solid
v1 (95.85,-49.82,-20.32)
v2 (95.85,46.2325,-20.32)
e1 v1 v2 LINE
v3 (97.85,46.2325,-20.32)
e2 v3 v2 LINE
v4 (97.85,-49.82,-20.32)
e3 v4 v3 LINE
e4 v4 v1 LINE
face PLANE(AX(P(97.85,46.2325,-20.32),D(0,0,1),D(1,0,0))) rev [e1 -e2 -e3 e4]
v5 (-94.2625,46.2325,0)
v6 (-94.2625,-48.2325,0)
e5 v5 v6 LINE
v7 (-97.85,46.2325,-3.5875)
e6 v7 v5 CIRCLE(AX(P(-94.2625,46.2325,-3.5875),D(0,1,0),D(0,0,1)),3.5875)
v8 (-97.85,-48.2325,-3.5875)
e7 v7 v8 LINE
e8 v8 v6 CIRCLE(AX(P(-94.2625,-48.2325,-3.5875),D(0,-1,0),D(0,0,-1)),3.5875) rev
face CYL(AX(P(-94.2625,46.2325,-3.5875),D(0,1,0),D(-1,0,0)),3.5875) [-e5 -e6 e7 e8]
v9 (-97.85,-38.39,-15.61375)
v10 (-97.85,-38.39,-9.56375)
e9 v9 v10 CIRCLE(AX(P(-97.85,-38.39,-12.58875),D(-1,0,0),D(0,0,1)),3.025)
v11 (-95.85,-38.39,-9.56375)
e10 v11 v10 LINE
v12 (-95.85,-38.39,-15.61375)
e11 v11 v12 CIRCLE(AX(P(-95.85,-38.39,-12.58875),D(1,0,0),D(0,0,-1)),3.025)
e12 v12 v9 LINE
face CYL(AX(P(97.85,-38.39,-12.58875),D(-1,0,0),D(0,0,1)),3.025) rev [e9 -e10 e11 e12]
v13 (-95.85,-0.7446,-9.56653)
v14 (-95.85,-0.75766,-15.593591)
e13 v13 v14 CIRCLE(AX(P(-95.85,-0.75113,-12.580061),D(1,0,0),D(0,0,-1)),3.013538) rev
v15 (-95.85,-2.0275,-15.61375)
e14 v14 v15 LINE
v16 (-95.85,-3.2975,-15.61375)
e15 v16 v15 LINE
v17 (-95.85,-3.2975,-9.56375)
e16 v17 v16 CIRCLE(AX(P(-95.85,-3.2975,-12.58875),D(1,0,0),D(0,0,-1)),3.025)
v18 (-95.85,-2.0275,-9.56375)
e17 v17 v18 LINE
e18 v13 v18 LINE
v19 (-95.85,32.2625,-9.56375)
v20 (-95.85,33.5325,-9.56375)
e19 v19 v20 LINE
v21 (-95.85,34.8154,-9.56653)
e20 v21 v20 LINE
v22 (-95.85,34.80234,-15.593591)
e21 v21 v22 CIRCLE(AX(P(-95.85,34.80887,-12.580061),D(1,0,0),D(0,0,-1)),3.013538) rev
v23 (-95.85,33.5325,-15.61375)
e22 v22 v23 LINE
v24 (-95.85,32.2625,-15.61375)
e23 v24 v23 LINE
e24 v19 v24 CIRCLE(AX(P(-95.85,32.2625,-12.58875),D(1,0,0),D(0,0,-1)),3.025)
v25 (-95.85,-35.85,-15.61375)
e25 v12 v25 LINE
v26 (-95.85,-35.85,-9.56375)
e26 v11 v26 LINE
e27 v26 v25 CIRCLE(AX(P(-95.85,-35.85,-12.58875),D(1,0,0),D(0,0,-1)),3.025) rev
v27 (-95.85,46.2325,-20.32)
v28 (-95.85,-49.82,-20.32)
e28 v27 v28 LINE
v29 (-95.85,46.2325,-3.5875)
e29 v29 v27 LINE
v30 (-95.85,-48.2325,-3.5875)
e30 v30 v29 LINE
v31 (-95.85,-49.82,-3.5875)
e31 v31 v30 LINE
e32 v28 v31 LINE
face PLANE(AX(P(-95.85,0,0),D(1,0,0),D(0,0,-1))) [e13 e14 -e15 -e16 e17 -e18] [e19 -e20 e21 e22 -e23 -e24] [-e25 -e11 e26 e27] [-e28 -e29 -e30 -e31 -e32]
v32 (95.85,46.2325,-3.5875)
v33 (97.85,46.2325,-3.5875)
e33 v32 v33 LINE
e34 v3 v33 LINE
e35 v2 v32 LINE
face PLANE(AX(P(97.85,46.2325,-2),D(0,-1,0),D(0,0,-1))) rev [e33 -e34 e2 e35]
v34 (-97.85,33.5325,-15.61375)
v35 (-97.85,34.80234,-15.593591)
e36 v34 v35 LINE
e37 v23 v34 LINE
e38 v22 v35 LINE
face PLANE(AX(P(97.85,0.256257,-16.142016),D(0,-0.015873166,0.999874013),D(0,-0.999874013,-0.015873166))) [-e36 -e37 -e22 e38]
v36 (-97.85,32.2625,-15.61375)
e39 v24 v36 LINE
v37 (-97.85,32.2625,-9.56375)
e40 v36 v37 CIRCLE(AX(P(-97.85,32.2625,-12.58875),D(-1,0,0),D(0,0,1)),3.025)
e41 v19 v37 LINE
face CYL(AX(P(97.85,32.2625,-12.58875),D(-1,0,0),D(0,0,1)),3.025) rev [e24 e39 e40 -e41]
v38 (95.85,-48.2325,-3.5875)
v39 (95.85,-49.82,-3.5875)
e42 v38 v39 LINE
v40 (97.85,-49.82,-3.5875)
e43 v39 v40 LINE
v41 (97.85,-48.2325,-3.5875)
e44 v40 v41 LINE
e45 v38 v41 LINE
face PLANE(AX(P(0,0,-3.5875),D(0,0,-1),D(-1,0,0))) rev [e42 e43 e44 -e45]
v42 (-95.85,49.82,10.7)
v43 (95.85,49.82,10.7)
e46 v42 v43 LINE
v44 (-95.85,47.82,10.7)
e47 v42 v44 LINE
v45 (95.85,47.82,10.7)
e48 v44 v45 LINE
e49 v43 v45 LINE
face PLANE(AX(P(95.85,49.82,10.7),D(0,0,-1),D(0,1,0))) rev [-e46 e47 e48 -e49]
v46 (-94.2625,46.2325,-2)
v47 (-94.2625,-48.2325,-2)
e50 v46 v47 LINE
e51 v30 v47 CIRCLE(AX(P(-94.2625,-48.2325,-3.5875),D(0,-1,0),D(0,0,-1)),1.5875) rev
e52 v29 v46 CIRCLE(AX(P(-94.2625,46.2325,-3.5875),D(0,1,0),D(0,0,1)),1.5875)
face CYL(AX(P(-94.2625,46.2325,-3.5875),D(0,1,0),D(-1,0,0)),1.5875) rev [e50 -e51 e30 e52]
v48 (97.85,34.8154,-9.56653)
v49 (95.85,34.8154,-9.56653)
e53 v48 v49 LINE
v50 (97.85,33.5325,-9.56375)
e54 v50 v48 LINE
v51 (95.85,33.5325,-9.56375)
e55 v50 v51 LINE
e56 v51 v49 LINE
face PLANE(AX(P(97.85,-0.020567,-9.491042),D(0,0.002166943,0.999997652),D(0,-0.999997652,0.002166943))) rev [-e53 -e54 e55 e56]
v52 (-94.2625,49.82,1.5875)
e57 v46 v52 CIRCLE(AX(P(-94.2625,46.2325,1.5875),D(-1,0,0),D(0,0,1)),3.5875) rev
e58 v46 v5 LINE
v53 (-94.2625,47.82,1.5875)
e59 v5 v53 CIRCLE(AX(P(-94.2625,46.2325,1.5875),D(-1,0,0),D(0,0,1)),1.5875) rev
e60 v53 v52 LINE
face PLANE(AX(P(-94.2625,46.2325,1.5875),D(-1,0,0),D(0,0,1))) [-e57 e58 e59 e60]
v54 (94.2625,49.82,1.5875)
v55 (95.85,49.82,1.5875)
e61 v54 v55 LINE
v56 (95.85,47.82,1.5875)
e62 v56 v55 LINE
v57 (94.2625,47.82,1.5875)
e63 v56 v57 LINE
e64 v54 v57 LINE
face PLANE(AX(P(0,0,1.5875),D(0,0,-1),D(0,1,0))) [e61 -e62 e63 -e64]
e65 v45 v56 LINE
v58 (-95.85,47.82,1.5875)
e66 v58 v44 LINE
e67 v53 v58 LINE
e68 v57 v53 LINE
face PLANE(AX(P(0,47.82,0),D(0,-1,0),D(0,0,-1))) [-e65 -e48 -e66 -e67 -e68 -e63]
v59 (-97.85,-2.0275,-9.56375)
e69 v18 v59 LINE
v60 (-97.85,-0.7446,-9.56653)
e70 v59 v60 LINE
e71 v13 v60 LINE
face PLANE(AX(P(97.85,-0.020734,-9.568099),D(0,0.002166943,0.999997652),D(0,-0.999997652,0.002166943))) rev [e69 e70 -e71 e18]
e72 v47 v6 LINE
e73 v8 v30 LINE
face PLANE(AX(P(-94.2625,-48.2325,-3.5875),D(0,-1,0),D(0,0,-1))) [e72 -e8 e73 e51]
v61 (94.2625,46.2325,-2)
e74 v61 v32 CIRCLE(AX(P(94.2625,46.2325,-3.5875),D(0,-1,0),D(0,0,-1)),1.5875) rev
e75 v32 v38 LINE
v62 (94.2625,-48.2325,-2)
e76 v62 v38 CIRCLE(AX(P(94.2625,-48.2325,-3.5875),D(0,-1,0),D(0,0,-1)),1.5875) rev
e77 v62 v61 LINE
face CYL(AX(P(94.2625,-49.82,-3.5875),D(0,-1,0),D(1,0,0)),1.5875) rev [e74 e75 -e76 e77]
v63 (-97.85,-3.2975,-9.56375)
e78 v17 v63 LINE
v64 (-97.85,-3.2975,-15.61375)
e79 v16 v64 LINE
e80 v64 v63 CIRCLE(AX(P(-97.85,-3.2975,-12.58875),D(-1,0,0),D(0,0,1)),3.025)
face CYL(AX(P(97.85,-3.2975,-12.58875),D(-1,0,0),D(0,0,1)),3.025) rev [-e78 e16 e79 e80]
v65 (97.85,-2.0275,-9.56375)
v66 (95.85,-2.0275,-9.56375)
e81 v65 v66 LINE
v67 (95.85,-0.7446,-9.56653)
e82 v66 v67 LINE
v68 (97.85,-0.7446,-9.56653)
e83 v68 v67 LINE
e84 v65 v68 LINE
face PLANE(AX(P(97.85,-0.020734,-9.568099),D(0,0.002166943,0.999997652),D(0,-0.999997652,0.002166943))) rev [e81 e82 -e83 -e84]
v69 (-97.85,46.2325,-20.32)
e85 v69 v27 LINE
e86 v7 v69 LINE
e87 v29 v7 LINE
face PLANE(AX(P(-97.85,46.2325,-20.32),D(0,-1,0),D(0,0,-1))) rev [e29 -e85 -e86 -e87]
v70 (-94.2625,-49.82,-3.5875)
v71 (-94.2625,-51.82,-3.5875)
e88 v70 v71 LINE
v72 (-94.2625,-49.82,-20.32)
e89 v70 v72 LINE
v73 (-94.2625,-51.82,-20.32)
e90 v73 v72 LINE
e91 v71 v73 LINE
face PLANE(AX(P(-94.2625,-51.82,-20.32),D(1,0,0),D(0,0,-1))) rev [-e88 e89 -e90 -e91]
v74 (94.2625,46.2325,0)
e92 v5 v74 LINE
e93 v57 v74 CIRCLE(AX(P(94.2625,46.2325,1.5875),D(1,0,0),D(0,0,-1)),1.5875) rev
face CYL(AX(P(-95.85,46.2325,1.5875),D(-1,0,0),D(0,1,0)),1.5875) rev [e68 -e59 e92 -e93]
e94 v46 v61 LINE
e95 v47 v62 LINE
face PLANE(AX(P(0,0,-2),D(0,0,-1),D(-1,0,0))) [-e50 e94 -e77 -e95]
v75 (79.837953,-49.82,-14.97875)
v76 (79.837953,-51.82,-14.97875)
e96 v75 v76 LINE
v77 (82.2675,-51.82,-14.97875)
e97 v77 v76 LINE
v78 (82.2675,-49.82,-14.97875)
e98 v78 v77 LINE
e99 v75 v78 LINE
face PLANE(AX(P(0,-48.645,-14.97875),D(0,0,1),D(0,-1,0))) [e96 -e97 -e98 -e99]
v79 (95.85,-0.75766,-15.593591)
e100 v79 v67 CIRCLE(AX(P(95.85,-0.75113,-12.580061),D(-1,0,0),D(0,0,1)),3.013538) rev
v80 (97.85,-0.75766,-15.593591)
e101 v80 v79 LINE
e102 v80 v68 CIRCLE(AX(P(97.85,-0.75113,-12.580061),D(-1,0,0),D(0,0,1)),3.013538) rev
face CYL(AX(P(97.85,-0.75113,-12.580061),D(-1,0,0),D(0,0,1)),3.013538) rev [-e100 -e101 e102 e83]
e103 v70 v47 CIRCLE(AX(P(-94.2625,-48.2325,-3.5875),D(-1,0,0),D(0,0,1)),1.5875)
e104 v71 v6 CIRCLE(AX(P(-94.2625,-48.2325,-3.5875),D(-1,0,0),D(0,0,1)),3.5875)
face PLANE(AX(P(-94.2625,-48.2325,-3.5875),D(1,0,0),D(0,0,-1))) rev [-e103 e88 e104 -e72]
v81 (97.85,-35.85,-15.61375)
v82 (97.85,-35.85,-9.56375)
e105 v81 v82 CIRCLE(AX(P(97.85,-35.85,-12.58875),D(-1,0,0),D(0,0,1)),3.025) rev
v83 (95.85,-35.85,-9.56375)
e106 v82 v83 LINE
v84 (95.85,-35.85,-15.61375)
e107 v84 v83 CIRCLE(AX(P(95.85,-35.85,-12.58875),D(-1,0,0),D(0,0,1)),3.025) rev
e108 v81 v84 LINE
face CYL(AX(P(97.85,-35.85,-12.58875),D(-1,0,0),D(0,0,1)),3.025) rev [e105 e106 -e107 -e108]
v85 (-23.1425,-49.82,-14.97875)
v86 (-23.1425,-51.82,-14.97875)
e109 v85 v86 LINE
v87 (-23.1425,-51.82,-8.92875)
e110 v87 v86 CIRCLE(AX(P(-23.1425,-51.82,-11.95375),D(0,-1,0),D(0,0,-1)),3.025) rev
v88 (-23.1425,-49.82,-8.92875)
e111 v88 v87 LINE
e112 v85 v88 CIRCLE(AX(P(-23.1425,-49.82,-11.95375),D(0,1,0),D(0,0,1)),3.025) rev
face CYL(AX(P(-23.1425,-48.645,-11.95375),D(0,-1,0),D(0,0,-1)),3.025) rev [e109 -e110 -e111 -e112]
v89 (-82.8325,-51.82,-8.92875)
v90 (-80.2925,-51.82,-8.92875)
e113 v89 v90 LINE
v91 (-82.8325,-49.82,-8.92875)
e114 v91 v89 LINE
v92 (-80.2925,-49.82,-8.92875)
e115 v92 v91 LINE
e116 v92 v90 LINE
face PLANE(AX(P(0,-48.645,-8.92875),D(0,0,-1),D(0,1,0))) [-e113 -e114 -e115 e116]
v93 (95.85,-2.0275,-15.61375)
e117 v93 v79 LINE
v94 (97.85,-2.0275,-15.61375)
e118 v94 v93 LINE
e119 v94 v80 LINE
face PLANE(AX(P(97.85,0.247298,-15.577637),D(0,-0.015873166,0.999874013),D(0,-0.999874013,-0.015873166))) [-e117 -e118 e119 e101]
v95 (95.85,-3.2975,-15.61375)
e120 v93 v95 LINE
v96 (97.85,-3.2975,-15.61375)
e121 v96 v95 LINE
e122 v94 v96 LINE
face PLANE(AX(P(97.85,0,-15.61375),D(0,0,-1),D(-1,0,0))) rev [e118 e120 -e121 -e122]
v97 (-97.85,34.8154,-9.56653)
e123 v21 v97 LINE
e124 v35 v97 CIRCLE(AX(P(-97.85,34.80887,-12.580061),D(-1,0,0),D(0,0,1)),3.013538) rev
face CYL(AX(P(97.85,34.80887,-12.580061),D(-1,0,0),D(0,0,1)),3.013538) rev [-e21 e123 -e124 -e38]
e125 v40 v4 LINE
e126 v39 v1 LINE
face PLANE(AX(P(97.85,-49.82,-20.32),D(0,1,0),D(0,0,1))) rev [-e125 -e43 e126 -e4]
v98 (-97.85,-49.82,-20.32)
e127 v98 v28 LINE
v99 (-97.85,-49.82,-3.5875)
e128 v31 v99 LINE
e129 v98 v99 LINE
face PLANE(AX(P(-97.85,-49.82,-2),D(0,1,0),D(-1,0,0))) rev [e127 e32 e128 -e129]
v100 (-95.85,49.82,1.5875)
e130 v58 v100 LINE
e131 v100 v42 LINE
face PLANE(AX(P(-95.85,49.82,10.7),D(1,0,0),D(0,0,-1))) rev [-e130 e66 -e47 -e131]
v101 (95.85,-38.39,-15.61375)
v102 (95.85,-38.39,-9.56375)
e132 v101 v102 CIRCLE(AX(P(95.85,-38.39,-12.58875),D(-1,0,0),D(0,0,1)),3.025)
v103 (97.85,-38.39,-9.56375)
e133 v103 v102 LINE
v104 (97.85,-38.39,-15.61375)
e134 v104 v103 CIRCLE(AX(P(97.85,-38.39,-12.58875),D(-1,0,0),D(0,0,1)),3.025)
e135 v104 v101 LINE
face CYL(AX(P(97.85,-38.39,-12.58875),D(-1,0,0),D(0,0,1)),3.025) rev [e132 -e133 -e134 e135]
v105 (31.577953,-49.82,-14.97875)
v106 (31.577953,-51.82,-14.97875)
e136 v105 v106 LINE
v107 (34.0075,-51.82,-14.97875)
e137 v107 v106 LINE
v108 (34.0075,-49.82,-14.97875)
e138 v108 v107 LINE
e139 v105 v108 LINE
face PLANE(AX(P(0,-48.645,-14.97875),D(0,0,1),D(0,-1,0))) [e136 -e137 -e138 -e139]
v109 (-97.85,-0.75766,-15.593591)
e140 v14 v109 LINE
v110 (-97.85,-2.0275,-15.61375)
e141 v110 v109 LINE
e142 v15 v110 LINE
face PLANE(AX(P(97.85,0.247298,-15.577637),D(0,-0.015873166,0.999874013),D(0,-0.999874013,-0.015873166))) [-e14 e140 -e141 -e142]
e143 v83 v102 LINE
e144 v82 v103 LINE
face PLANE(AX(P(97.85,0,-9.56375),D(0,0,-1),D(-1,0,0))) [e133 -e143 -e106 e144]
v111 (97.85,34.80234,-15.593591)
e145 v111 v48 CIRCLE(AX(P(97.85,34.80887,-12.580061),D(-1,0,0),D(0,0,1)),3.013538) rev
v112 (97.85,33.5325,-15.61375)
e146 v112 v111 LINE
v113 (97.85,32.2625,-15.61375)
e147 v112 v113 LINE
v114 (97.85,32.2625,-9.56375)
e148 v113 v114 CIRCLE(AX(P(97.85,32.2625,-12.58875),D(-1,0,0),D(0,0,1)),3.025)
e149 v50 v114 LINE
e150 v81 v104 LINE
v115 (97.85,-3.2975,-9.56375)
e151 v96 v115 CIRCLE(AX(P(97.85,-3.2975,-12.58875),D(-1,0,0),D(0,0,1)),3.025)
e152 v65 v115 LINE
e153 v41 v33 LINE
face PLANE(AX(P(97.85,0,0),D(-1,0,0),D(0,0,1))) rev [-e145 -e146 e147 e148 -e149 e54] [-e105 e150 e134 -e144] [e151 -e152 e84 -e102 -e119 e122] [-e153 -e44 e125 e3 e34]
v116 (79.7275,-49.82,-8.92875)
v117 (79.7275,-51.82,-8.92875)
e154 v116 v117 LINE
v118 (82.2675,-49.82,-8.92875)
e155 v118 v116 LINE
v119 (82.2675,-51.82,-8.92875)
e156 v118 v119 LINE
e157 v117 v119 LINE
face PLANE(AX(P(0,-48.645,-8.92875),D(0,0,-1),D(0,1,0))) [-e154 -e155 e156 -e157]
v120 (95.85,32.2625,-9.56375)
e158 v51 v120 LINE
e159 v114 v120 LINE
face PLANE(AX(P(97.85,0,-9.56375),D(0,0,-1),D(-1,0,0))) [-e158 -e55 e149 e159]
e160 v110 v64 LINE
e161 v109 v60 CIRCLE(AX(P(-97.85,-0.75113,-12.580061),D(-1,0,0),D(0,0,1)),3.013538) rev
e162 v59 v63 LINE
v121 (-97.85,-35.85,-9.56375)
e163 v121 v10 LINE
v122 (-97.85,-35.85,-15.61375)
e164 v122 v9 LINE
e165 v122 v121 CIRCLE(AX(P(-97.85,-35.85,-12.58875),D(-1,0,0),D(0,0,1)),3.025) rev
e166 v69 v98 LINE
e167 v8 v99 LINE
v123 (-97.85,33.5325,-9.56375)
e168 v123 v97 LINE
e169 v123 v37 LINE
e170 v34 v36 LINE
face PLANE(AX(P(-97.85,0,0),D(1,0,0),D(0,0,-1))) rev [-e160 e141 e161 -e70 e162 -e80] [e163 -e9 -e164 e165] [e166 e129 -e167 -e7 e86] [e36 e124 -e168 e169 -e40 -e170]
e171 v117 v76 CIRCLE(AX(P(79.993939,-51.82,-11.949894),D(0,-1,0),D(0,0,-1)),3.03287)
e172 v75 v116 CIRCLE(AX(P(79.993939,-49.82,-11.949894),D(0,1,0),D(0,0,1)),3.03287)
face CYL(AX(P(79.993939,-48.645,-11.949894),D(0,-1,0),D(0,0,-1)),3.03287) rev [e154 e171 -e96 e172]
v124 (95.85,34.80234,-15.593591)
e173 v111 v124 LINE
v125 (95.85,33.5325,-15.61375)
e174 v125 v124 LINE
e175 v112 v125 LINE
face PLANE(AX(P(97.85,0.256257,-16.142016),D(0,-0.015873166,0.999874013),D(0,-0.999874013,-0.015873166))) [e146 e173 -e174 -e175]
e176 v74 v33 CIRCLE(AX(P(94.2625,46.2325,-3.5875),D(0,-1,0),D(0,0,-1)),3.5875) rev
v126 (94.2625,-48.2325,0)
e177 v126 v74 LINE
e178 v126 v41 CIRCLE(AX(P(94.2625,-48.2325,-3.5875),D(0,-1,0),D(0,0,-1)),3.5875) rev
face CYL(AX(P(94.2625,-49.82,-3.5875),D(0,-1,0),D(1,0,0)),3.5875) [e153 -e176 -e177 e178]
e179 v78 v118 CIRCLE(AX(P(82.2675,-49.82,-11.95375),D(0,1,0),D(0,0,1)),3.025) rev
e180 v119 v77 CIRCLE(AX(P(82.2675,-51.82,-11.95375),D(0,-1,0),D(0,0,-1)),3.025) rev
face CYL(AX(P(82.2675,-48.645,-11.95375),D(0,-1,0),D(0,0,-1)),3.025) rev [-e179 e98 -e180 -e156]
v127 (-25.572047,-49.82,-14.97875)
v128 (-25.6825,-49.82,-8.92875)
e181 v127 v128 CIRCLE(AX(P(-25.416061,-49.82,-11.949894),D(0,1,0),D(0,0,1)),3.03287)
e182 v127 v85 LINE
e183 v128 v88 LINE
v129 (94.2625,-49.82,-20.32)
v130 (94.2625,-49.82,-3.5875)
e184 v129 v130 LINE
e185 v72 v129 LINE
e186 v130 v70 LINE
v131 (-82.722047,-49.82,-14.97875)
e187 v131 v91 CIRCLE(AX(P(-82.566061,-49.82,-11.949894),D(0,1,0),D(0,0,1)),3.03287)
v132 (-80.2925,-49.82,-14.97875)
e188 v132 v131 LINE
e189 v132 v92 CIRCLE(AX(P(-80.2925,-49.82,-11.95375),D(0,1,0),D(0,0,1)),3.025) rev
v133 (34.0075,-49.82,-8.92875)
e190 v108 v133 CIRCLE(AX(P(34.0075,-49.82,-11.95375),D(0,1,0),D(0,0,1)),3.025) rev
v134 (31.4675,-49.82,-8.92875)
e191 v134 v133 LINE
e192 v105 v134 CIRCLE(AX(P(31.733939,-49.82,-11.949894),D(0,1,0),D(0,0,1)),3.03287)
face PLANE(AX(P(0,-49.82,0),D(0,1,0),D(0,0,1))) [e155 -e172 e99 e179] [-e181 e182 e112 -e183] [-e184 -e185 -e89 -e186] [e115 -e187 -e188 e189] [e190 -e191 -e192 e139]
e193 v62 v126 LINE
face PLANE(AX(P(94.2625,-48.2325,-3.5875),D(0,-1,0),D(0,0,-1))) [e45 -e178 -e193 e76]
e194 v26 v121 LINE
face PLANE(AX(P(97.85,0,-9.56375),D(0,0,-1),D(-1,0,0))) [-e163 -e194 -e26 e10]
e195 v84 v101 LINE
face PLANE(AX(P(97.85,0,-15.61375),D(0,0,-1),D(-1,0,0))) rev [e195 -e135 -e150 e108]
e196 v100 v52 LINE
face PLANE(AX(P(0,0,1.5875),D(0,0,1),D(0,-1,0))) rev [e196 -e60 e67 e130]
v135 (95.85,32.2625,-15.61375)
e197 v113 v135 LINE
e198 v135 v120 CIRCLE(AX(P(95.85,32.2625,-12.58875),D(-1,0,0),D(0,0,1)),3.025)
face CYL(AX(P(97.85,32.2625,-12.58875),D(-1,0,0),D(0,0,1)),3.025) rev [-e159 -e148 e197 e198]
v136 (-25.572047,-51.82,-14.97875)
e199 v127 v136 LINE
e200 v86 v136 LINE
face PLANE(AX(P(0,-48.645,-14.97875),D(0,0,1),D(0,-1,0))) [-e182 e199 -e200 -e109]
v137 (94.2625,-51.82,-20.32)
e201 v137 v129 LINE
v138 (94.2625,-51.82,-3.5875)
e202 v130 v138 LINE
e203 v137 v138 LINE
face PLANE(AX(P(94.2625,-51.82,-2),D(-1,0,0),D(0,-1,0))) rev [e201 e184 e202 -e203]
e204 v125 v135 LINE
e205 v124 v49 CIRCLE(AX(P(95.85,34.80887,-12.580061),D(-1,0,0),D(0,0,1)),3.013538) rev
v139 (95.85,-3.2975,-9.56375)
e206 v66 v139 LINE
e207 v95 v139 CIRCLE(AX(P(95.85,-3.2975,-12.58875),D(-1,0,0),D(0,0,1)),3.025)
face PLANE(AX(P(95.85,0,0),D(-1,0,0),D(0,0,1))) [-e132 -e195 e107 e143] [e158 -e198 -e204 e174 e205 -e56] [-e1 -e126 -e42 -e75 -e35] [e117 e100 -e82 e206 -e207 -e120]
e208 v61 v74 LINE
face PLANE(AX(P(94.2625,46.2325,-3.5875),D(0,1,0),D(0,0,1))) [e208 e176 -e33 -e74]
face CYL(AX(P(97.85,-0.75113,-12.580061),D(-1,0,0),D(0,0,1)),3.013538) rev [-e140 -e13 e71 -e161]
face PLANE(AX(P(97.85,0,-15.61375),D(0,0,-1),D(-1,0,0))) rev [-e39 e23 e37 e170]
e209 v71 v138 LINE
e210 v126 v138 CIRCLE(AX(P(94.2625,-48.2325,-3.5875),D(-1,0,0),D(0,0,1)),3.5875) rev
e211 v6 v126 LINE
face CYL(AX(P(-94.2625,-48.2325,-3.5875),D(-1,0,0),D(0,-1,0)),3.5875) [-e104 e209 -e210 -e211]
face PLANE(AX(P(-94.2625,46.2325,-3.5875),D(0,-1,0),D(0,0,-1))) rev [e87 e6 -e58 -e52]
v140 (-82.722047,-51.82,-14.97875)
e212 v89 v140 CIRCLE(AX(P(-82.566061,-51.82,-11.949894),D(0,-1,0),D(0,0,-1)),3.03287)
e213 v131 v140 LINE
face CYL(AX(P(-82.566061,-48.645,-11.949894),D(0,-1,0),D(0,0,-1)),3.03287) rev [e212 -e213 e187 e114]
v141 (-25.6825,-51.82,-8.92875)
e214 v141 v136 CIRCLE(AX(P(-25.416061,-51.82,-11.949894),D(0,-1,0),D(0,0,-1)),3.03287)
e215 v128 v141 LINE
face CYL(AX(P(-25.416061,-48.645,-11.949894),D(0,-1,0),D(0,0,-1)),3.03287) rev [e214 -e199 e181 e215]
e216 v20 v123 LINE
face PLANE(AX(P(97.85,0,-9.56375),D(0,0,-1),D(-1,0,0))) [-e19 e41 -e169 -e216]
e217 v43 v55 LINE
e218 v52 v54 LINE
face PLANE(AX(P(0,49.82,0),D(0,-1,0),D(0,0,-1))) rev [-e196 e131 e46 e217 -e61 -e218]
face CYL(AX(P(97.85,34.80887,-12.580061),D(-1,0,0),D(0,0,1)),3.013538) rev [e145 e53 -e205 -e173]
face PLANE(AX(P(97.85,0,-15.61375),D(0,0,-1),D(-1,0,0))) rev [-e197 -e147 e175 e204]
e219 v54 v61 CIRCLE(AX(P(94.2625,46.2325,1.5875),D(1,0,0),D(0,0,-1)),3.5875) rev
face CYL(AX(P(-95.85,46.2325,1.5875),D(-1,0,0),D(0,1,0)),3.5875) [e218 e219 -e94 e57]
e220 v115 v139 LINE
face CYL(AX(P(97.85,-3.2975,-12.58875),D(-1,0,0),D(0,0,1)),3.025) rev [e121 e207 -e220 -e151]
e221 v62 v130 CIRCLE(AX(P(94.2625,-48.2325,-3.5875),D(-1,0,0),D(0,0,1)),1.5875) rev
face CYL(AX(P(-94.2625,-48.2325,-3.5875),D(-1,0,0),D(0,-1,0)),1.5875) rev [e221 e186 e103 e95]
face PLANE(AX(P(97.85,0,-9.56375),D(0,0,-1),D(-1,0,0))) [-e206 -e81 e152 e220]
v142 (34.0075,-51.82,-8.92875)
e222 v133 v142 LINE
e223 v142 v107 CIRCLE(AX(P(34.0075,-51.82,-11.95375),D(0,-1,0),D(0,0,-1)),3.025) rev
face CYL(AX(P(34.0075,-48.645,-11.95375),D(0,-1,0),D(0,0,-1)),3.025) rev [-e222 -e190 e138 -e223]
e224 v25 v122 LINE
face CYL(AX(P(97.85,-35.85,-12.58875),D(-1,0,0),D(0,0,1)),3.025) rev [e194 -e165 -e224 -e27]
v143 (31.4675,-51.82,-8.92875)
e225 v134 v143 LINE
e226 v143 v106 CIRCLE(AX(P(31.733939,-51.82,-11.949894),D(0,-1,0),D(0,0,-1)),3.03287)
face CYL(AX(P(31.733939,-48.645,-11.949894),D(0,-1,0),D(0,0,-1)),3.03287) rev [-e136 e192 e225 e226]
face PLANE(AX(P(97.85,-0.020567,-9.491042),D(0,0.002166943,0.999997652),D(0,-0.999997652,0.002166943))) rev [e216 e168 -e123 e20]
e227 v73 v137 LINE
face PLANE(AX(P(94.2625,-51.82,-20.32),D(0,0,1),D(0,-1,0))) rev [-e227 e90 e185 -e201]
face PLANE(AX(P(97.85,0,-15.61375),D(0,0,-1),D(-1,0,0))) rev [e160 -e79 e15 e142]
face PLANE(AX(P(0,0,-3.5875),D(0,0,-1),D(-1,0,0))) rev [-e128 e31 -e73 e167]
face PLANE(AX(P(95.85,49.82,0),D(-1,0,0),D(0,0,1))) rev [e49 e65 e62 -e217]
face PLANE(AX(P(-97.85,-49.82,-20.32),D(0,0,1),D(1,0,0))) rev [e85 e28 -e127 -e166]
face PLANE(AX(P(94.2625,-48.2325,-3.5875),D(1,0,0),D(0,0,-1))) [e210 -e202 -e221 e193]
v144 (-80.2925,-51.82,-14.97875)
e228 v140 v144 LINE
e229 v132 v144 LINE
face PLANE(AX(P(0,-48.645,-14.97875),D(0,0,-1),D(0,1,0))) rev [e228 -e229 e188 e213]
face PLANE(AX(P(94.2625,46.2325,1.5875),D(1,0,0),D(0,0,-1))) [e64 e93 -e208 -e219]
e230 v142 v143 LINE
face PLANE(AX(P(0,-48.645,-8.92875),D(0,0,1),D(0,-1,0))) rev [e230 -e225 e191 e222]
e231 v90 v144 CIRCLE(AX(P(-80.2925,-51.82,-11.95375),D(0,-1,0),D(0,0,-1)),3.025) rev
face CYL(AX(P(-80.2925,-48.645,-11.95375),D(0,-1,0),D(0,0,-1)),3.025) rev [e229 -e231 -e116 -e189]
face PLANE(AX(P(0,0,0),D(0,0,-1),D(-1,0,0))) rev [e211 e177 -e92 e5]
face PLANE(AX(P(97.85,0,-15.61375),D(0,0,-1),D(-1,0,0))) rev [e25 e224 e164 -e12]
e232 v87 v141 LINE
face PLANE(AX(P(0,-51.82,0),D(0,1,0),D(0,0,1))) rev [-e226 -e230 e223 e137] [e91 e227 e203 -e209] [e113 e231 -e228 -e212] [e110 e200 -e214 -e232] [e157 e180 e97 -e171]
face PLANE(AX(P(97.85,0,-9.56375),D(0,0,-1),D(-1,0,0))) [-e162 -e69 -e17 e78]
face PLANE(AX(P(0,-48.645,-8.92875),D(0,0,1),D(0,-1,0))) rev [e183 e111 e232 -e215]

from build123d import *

# Parameters (mm, degrees)
SKETCH1_W                    = 191.7
SKETCH1_H                    = 99.64
BASE_FLANGE4_DEPTH           = 2
EDGE_FLANGE2_STRIP_W         = 11.175
EDGE_FLANGE2_STRIP_H         = 2
EDGE_FLANGE2_STRIP_CUT_DEPTH = 191.7
EDGE_FLANGE2_DEPTH           = 191.7
EDGE_FLANGE1_START           = -49.82
EDGE_FLANGE1_DEPTH           = 99.64
EDGE_FLANGE1_START_2         = 46.2325
EDGE_FLANGE1_2_DEPTH         = 3.5875
EDGE_FLANGE1_3_DEPTH         = 96.0525
EDGE_FLANGE3_START           = -97.85
EDGE_FLANGE3_DEPTH           = 195.7
EDGE_FLANGE3_2_DEPTH         = 3.5875
EDGE_FLANGE3_START_2         = 94.2625
EDGE_FLANGE3_3_DEPTH         = 3.5875
EDGE_FLANGE3_START_3         = -94.2625
EDGE_FLANGE3_4_DEPTH         = 188.525
CUT_EXTRUDE1_DEPTH           = 204.46180182
CUT_EXTRUDE2_DEPTH           = 3.175


# Read off the part's stored shape, not the designer's step: Edge-Flange1, Edge-Flange3
# Sheet-metal steps are written as plain solids
with BuildPart() as part:
    # Sketch1 → Base-Flange4 (new body)
    with BuildSketch(Plane.XY):
        Rectangle(SKETCH1_W, SKETCH1_H)
    extrude(amount=-BASE_FLANGE4_DEPTH)

    # Edge-Flange2 strip (across the edge) → Edge-Flange2 strip cut (cut)
    with BuildSketch(Plane(origin=(95.85, 49.82, 0), x_dir=(0, -1, 0), z_dir=(-1, 0, 0))):
        with Locations((-2, -1)):
            Rectangle(EDGE_FLANGE2_STRIP_W, EDGE_FLANGE2_STRIP_H)
    extrude(amount=EDGE_FLANGE2_STRIP_CUT_DEPTH, mode=Mode.SUBTRACT)

    # Edge-Flange2 section (across the edge) → Edge-Flange2 (add)
    with BuildSketch(Plane(origin=(95.85, 49.82, 0), x_dir=(0, -1, 0), z_dir=(-1, 0, 0))):
        with BuildLine():
            Line((0, 1.5875), (0, 10.7))
            Line((0, 10.7), (2, 10.7))
            Line((2, 10.7), (2, 1.5875))
            ThreePointArc((2, 1.5875), (2.464967985, 0.464967985), (3.5875, 0))
            Line((3.5875, 0), (3.5875, -2))
            ThreePointArc((3.5875, -2), (1.050754422, -0.949245578), (0, 1.5875))
        make_face()
    extrude(amount=EDGE_FLANGE2_DEPTH)

    # Edge-Flange1 outline → Edge-Flange1 (cut)
    with BuildSketch(Plane(origin=(0, 0, 0), x_dir=(1, 0, 0), z_dir=(0, 1, 0)).offset(EDGE_FLANGE1_START)):
        with BuildLine():
            Line((94.2625, -1.5875), (95.85, -1.5875))
            Line((95.85, -1.5875), (95.85, 0.370358411))
            ThreePointArc((95.85, 0.370358411), (95.07756466, 0.093816292), (94.2625, 0))
            Line((94.2625, 0), (94.2625, -1.5875))
        make_face()
        with BuildLine():
            Line((-95.85, 0.370358411), (-95.85, -1.5875))
            Line((-95.85, -1.5875), (-94.2625, -1.5875))
            Line((-94.2625, -1.5875), (-94.2625, 0))
            ThreePointArc((-94.2625, 0), (-95.07756466, 0.093816292), (-95.85, 0.370358411))
        make_face()
    extrude(amount=EDGE_FLANGE1_DEPTH, mode=Mode.SUBTRACT)

    # Edge-Flange1 2 outline → Edge-Flange1 2 (cut)
    with BuildSketch(Plane(origin=(0, 0, 0), x_dir=(1, 0, 0), z_dir=(0, 1, 0)).offset(EDGE_FLANGE1_START_2)):
        with BuildLine():
            Line((94.2625, 2), (94.2625, 0))
            ThreePointArc((94.2625, 0), (95.07756466, 0.093816292), (95.85, 0.370358411))
            ThreePointArc((95.85, 0.370358411), (97.30924519, 1.693430307), (97.85, 3.5875))
            Line((97.85, 3.5875), (97.85, 20.32))
            Line((97.85, 20.32), (95.85, 20.32))
            Line((95.85, 20.32), (95.85, 3.5875))
            ThreePointArc((95.85, 3.5875), (95.385032015, 2.464967985), (94.2625, 2))
        make_face()
        with BuildLine():
            ThreePointArc((-95.85, 0.370358411), (-95.07756466, 0.093816292), (-94.2625, 0))
            Line((-94.2625, 0), (-94.2625, 2))
            ThreePointArc((-94.2625, 2), (-95.385032015, 2.464967985), (-95.85, 3.5875))
            Line((-95.85, 3.5875), (-95.85, 20.32))
            Line((-95.85, 20.32), (-97.85, 20.32))
            Line((-97.85, 20.32), (-97.85, 3.5875))
            ThreePointArc((-97.85, 3.5875), (-97.30924519, 1.693430307), (-95.85, 0.370358411))
        make_face()
    extrude(amount=EDGE_FLANGE1_2_DEPTH, mode=Mode.SUBTRACT)

    # Edge-Flange1 3 outline → Edge-Flange1 3 (add)
    with BuildSketch(Plane(origin=(0, 0, 0), x_dir=(1, 0, 0), z_dir=(0, 1, 0)).offset(EDGE_FLANGE1_START)):
        with BuildLine():
            Line((94.2625, 2), (94.2625, 0))
            ThreePointArc((94.2625, 0), (95.07756466, 0.093816292), (95.85, 0.370358411))
            ThreePointArc((95.85, 0.370358411), (97.30924519, 1.693430307), (97.85, 3.5875))
            Line((97.85, 3.5875), (97.85, 20.32))
            Line((97.85, 20.32), (95.85, 20.32))
            Line((95.85, 20.32), (95.85, 3.5875))
            ThreePointArc((95.85, 3.5875), (95.385032015, 2.464967985), (94.2625, 2))
        make_face()
        with BuildLine():
            ThreePointArc((-95.85, 0.370358411), (-95.07756466, 0.093816292), (-94.2625, 0))
            Line((-94.2625, 0), (-94.2625, 2))
            ThreePointArc((-94.2625, 2), (-95.385032015, 2.464967985), (-95.85, 3.5875))
            Line((-95.85, 3.5875), (-95.85, 20.32))
            Line((-95.85, 20.32), (-97.85, 20.32))
            Line((-97.85, 20.32), (-97.85, 3.5875))
            ThreePointArc((-97.85, 3.5875), (-97.30924519, 1.693430307), (-95.85, 0.370358411))
        make_face()
    extrude(amount=EDGE_FLANGE1_3_DEPTH)

    # Edge-Flange3 outline → Edge-Flange3 (cut)
    with BuildSketch(Plane.YZ.offset(EDGE_FLANGE3_START)):
        with BuildLine():
            ThreePointArc((-48.2325, -2), (-49.355032015, -2.464967985), (-49.82, -3.5875))
            Line((-49.82, -3.5875), (-48.2325, -3.5875))
            Line((-48.2325, -3.5875), (-48.2325, -2))
        make_face()
        with BuildLine():
            ThreePointArc((-49.82, -0.370358411), (-49.04756466, -0.093816292), (-48.2325, 0))
            Line((-48.2325, 0), (-49.82, 0))
            Line((-49.82, 0), (-49.82, -0.370358411))
        make_face()
    extrude(amount=EDGE_FLANGE3_DEPTH, mode=Mode.SUBTRACT)

    # Edge-Flange3 2 outline → Edge-Flange3 2 (cut)
    with BuildSketch(Plane.YZ.offset(EDGE_FLANGE3_START)):
        with BuildLine():
            ThreePointArc((-49.82, -3.5875), (-49.355032015, -2.464967985), (-48.2325, -2))
            Line((-48.2325, -2), (-48.2325, 0))
            ThreePointArc((-48.2325, 0), (-49.04756466, -0.093816292), (-49.82, -0.370358411))
            Line((-49.82, -0.370358411), (-49.82, -3.5875))
        make_face()
    extrude(amount=EDGE_FLANGE3_2_DEPTH, mode=Mode.SUBTRACT)

    # Edge-Flange3 3 outline → Edge-Flange3 3 (cut)
    with BuildSketch(Plane.YZ.offset(EDGE_FLANGE3_START_2)):
        with BuildLine():
            ThreePointArc((-49.82, -3.5875), (-49.355032015, -2.464967985), (-48.2325, -2))
            Line((-48.2325, -2), (-48.2325, 0))
            ThreePointArc((-48.2325, 0), (-49.04756466, -0.093816292), (-49.82, -0.370358411))
            Line((-49.82, -0.370358411), (-49.82, -3.5875))
        make_face()
    extrude(amount=EDGE_FLANGE3_3_DEPTH, mode=Mode.SUBTRACT)

    # Edge-Flange3 4 outline → Edge-Flange3 4 (add)
    with BuildSketch(Plane.YZ.offset(EDGE_FLANGE3_START_3)):
        with BuildLine():
            Line((-48.2325, -2), (-49.82, -2))
            Line((-49.82, -2), (-49.82, -0.370358411))
            ThreePointArc((-49.82, -0.370358411), (-51.27924519, -1.693430307), (-51.82, -3.5875))
            Line((-51.82, -3.5875), (-51.82, -20.32))
            Line((-51.82, -20.32), (-49.82, -20.32))
            Line((-49.82, -20.32), (-49.82, -3.5875))
            ThreePointArc((-49.82, -3.5875), (-49.355032015, -2.464967985), (-48.2325, -2))
        make_face()
    extrude(amount=EDGE_FLANGE3_4_DEPTH)

    # Sketch42 → Cut-Extrude1 (cut, through all)
    with BuildSketch(Plane.ZY.offset(97.85)):
        with BuildLine():
            ThreePointArc((-9.566529979, 34.815400328), (-12.586590694, 37.822400713), (-15.593591079, 34.802339997))
            Line((-15.593591079, 34.802339997), (-15.61375, 33.5325))
            Line((-15.61375, 33.5325), (-15.61375, 32.2625))
            ThreePointArc((-15.61375, 32.2625), (-12.58875, 29.2375), (-9.56375, 32.2625))
            Line((-9.56375, 32.2625), (-9.56375, 33.5325))
            Line((-9.56375, 33.5325), (-9.566529979, 34.815400328))
        make_face()
        with BuildLine():
            Line((-15.61375, -35.85), (-15.61375, -38.39))
            ThreePointArc((-15.61375, -38.39), (-12.58875, -41.415), (-9.56375, -38.39))
            Line((-9.56375, -38.39), (-9.56375, -35.85))
            ThreePointArc((-9.56375, -35.85), (-12.58875, -32.825), (-15.61375, -35.85))
        make_face()
        with BuildLine():
            Line((-9.56375, -3.2975), (-9.56375, -2.0275))
            Line((-9.56375, -2.0275), (-9.566529979, -0.744599672))
            ThreePointArc((-9.566529979, -0.744599672), (-12.586590694, 2.262400713), (-15.593591079, -0.757660003))
            Line((-15.593591079, -0.757660003), (-15.61375, -2.0275))
            Line((-15.61375, -2.0275), (-15.61375, -3.2975))
            ThreePointArc((-15.61375, -3.2975), (-12.58875, -6.3225), (-9.56375, -3.2975))
        make_face()
    extrude(amount=-CUT_EXTRUDE1_DEPTH, mode=Mode.SUBTRACT)

    # Sketch43 → Cut-Extrude2 (cut)
    with BuildSketch(Plane.XZ.offset(51.82)):
        with BuildLine():
            Line((-23.1425, -8.92875), (-25.6825, -8.92875))
            ThreePointArc((-25.6825, -8.92875), (-28.448425456, -12.005254825), (-25.572047177, -14.97875))
            Line((-25.572047177, -14.97875), (-23.1425, -14.97875))
            ThreePointArc((-23.1425, -14.97875), (-20.1175, -11.95375), (-23.1425, -8.92875))
        make_face()
        with BuildLine():
            Line((34.0075, -8.92875), (31.4675, -8.92875))
            ThreePointArc((31.4675, -8.92875), (28.701574544, -12.005254825), (31.577952823, -14.97875))
            Line((31.577952823, -14.97875), (34.0075, -14.97875))
            ThreePointArc((34.0075, -14.97875), (37.0325, -11.95375), (34.0075, -8.92875))
        make_face()
        with BuildLine():
            ThreePointArc((-80.2925, -14.97875), (-77.2675, -11.95375), (-80.2925, -8.92875))
            Line((-80.2925, -8.92875), (-82.8325, -8.92875))
            ThreePointArc((-82.8325, -8.92875), (-85.598425456, -12.005254825), (-82.722047177, -14.97875))
            Line((-82.722047177, -14.97875), (-80.2925, -14.97875))
        make_face()
        with BuildLine():
            Line((82.2675, -8.92875), (79.7275, -8.92875))
            ThreePointArc((79.7275, -8.92875), (76.961574544, -12.005254825), (79.837952823, -14.97875))
            Line((79.837952823, -14.97875), (82.2675, -14.97875))
            ThreePointArc((82.2675, -14.97875), (85.2925, -11.95375), (82.2675, -8.92875))
        make_face()
    extrude(amount=-CUT_EXTRUDE2_DEPTH, mode=Mode.SUBTRACT)


solid = part.part
